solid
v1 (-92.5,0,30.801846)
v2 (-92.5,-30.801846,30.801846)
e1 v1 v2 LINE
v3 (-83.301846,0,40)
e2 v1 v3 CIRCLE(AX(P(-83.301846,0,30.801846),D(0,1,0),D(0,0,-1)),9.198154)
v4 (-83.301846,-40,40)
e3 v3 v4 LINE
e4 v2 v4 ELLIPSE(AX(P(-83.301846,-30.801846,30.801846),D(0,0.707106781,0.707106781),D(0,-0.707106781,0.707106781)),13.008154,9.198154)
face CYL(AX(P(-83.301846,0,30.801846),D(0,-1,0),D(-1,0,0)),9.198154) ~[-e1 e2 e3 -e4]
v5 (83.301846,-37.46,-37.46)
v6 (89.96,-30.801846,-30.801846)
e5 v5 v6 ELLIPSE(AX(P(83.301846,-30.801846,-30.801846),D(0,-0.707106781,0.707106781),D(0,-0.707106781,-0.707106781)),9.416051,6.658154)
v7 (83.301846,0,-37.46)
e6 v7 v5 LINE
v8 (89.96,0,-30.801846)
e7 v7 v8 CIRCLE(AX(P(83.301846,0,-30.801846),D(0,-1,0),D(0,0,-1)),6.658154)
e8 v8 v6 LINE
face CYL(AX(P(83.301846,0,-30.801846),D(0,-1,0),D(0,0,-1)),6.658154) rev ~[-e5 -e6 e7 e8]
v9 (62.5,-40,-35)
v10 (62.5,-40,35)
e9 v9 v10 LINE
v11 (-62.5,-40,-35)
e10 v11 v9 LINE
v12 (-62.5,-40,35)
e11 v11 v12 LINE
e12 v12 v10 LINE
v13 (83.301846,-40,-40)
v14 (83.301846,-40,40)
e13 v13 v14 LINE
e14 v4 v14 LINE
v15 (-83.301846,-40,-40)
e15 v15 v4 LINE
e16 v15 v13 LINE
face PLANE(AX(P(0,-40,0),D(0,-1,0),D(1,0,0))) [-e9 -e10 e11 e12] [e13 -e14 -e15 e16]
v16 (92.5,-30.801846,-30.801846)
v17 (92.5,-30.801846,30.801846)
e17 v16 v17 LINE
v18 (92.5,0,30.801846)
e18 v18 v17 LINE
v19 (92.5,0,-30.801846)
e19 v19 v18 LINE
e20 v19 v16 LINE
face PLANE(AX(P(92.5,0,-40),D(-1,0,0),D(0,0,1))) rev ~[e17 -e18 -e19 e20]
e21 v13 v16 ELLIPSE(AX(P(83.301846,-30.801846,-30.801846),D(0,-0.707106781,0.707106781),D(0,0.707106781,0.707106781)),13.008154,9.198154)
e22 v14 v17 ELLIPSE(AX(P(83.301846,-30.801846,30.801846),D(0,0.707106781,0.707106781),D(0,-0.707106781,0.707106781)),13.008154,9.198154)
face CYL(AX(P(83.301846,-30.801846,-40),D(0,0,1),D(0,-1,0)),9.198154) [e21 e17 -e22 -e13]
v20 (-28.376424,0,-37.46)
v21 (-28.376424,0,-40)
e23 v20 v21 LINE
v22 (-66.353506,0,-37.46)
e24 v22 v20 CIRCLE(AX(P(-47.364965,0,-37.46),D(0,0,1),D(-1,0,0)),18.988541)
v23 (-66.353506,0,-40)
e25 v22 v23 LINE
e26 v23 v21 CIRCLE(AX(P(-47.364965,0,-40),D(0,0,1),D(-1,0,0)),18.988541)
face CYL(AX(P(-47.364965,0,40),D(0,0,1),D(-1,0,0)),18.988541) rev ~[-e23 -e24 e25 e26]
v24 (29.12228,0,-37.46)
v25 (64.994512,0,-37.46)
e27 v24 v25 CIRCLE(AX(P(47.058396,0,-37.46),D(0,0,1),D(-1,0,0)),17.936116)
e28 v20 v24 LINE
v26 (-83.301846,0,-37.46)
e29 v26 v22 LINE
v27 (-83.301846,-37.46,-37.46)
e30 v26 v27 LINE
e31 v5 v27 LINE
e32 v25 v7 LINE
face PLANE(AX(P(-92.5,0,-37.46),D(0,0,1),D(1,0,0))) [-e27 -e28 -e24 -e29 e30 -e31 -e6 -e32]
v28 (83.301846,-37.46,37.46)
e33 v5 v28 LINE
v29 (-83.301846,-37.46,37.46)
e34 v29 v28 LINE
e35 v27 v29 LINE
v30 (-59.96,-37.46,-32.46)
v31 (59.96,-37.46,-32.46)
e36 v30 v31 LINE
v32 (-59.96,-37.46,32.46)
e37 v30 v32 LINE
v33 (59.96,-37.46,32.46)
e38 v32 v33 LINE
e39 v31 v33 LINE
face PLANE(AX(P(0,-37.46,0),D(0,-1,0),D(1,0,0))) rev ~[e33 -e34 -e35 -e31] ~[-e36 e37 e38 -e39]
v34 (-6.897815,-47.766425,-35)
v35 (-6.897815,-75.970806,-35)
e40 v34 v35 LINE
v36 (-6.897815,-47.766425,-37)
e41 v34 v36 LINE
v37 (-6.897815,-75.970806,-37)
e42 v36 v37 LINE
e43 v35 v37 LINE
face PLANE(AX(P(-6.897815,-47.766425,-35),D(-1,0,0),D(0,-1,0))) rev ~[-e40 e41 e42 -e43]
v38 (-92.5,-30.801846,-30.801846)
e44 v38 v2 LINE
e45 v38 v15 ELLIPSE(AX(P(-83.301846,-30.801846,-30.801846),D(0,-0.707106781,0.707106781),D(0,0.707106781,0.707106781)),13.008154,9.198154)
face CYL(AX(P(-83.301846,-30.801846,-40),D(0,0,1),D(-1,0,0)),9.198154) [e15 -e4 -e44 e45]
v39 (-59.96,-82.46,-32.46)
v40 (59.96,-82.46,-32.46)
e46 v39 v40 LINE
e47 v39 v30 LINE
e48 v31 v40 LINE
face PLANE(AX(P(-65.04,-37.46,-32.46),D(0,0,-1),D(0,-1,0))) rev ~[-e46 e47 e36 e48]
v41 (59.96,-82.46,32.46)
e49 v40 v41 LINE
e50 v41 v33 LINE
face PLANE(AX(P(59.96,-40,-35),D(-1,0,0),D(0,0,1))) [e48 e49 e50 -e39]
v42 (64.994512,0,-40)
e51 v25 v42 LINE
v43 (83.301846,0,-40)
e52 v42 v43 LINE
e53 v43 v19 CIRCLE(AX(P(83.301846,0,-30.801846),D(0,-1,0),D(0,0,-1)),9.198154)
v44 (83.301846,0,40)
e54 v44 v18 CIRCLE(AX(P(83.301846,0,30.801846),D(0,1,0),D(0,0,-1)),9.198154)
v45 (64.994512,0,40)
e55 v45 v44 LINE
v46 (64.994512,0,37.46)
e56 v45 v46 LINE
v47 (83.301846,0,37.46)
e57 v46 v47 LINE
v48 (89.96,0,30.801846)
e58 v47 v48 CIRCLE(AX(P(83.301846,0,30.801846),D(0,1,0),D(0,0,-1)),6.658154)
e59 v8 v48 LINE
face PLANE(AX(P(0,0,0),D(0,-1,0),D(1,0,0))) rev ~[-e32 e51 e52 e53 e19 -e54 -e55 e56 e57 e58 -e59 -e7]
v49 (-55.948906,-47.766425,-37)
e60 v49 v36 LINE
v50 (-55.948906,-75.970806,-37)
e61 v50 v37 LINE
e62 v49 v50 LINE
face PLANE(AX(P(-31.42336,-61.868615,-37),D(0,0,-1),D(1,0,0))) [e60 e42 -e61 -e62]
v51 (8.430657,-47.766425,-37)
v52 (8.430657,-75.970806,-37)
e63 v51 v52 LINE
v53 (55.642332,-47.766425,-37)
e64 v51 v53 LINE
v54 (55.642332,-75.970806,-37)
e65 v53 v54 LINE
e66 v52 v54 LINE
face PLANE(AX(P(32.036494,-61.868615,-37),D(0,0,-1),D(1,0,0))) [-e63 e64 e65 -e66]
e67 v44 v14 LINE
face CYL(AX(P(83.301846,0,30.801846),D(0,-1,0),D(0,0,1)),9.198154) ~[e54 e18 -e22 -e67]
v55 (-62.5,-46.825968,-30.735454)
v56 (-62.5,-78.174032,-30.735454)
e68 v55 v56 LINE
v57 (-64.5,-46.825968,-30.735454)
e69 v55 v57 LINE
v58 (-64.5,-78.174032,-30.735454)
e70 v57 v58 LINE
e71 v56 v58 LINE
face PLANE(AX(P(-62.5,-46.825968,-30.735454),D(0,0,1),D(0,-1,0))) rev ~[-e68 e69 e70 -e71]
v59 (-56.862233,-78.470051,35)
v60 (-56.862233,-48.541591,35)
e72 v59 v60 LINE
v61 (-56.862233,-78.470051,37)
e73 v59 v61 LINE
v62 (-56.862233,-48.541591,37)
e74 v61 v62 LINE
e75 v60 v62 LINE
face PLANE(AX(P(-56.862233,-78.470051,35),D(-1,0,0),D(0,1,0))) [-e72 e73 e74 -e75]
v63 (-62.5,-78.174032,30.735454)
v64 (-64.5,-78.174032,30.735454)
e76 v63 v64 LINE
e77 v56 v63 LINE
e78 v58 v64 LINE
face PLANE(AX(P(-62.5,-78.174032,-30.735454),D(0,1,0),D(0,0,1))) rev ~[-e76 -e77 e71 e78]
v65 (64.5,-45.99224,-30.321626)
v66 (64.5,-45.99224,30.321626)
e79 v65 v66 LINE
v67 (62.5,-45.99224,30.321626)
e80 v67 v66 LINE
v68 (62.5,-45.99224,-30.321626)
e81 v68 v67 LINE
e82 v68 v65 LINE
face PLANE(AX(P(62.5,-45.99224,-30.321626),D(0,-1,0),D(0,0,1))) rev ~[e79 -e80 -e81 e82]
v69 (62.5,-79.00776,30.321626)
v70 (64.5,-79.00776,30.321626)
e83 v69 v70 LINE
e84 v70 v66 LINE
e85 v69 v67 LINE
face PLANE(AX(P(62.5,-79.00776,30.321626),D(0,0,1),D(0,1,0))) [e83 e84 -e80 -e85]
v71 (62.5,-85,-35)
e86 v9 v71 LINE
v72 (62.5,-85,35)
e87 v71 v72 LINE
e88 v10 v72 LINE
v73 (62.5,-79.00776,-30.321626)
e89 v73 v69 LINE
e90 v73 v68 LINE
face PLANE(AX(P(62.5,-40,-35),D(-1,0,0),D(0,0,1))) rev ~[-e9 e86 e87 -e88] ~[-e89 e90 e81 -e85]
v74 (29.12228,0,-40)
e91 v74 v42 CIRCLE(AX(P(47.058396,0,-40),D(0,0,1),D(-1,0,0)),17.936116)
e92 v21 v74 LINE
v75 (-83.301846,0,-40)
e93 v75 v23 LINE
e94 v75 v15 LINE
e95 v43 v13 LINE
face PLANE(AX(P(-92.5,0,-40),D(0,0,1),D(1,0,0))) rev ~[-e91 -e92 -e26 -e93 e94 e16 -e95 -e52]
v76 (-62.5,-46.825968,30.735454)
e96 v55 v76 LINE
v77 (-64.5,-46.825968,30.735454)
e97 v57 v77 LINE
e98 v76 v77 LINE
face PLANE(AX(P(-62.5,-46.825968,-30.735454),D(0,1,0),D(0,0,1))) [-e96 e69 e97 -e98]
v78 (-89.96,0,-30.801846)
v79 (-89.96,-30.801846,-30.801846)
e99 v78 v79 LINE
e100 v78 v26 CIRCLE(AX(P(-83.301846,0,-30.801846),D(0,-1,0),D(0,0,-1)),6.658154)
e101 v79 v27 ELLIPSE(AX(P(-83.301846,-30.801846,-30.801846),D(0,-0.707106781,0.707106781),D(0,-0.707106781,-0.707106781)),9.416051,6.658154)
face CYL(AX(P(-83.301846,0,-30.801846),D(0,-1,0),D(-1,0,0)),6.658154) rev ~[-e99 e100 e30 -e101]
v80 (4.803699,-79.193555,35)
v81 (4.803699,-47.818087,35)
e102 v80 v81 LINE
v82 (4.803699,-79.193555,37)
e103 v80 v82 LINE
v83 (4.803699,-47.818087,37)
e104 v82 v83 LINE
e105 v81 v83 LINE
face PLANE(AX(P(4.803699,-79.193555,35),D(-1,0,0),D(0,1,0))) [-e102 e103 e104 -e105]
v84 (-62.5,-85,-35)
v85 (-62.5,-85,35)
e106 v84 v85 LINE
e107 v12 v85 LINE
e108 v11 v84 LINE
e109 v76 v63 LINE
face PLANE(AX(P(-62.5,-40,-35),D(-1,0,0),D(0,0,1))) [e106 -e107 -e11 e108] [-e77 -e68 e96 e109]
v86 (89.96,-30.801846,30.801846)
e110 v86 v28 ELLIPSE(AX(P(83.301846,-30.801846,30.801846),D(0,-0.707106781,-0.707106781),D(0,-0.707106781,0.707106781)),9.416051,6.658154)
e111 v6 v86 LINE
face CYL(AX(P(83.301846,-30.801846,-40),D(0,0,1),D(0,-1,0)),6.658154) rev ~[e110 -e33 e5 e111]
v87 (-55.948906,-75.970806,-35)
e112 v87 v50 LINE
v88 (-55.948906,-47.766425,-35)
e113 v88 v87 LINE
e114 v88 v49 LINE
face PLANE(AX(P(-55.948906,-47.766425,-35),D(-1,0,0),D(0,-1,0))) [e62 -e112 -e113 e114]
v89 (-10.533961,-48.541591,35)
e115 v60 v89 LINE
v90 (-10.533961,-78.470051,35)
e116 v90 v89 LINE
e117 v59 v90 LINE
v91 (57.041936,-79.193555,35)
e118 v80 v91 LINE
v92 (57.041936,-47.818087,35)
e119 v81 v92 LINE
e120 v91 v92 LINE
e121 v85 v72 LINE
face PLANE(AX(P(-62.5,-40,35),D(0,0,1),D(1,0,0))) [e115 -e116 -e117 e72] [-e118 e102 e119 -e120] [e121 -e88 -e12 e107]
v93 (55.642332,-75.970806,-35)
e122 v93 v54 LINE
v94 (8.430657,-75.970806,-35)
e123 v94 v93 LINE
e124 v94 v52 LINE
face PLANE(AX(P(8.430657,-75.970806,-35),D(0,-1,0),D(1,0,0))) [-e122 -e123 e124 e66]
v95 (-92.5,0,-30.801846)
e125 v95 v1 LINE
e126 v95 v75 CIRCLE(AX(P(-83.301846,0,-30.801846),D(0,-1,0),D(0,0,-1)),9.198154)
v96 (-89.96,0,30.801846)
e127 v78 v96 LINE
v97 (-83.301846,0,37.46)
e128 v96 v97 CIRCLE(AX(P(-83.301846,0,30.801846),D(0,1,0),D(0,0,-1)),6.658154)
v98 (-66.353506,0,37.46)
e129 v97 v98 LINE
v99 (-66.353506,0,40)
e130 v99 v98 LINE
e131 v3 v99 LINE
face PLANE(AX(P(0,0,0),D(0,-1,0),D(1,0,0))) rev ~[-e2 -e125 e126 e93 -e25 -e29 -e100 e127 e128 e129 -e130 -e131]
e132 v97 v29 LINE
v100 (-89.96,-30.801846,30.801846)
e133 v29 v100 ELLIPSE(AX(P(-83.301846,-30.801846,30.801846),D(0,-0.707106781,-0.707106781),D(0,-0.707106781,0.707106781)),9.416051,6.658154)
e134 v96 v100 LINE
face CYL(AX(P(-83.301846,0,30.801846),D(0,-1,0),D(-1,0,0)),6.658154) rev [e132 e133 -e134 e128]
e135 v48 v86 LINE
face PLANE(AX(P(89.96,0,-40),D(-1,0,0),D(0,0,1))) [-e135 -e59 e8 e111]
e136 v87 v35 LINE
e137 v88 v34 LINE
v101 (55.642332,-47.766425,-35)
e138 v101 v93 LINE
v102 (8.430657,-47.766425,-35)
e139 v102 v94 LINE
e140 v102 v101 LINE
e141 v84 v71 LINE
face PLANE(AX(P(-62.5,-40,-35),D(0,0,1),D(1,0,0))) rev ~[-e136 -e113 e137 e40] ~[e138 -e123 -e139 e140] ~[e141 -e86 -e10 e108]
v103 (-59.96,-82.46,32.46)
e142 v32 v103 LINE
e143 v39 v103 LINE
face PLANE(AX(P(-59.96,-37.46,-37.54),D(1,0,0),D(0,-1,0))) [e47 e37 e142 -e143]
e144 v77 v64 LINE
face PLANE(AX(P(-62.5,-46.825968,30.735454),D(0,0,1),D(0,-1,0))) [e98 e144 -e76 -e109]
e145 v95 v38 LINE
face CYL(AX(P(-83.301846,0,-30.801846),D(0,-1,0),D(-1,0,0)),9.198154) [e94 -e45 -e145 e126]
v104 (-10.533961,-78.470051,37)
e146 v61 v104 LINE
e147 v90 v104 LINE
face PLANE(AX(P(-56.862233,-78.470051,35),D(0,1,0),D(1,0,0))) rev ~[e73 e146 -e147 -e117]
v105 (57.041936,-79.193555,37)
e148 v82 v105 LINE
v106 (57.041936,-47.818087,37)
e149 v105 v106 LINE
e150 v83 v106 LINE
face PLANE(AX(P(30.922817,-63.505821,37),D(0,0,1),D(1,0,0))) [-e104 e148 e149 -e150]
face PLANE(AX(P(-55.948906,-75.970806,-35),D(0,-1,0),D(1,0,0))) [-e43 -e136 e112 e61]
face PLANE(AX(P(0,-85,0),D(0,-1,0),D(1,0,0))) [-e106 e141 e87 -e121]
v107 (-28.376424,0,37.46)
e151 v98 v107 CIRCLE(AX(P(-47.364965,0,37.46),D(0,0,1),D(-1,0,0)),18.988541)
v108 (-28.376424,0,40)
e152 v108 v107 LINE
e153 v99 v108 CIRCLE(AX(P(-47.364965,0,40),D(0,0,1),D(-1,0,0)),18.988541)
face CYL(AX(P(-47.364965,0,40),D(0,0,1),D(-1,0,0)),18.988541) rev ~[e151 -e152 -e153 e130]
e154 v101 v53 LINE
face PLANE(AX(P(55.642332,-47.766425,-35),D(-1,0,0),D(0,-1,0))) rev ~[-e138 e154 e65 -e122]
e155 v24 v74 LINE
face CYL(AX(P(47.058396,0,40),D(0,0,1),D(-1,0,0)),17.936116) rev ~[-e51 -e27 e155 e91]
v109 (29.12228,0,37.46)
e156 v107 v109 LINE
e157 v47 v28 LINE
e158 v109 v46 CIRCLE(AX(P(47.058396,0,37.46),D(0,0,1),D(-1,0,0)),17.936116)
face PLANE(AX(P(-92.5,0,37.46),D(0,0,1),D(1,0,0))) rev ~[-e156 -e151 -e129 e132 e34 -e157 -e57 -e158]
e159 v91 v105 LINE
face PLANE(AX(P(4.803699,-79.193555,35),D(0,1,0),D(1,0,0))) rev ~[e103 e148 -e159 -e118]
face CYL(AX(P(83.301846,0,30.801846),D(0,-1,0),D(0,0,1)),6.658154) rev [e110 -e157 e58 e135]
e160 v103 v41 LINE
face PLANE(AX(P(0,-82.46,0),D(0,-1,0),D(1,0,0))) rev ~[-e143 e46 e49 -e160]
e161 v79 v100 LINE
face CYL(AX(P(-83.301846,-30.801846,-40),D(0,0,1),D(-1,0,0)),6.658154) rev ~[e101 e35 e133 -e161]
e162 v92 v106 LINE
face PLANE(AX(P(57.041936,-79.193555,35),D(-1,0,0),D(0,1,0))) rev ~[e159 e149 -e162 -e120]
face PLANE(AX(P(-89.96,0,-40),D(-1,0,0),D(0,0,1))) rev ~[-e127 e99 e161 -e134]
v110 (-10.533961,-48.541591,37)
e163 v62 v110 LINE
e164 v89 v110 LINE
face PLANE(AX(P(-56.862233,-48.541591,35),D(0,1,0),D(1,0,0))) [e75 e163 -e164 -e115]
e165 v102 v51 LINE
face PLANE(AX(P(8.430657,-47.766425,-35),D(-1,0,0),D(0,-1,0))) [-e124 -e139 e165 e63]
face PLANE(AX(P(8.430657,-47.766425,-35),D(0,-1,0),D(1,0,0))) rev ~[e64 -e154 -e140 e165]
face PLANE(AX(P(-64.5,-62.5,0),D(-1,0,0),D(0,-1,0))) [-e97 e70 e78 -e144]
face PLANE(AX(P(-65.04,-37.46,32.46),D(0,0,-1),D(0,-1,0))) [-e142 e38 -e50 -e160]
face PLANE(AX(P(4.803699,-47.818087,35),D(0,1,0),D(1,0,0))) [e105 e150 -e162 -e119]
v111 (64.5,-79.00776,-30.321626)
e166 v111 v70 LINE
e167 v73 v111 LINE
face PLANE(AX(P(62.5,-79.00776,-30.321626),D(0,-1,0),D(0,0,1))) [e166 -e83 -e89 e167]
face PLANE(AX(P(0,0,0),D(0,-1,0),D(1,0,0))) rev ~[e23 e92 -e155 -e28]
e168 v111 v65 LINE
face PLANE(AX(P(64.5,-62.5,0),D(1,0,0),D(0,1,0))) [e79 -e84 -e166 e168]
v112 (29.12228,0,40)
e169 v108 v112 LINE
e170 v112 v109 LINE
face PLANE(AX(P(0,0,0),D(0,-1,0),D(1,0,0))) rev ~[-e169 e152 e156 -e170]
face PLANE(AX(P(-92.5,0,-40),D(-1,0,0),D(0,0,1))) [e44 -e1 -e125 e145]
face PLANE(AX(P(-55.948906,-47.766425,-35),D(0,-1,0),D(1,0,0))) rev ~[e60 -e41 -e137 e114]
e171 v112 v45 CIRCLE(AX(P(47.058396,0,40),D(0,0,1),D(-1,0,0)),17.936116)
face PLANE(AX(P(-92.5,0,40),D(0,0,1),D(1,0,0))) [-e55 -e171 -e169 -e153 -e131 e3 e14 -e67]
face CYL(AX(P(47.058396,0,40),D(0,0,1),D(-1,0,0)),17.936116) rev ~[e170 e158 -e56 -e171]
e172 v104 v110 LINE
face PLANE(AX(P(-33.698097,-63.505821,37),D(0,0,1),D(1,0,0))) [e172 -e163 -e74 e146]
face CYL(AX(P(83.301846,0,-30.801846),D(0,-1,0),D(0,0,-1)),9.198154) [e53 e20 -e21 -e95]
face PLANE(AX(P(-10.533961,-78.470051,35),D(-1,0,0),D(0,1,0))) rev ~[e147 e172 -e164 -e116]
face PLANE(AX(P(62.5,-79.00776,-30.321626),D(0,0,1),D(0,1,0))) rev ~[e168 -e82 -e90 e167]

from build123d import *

# Parameters (mm, degrees)
F0_W        = 185
F0_H        = 80
F1_DEPTH    = 40
F2_W        = 125
F2_H        = 70
F3_DEPTH    = 45
F4_R        = 9.1981536726
F5_T        = 2.54
F5_T3_DEPTH = 130.08
F5_T5_DEPTH = 75.08
F7_DEPTH    = 112.6
F8_W        = 49.0510910749
F8_H        = 28.2043814659
F8_W_2      = 47.2116749734
F9_DEPTH    = 2
F10_W       = 52.2382371128
F10_H       = 31.3754677773
F10_W_2     = 46.3282726705
F10_H_2     = 29.9284607172
F11_DEPTH   = 2
F12_W       = 31.3480645418
F12_H       = 61.4709071815
F13_DEPTH   = 2
F14_W       = 33.0155193806
F14_H       = 60.6432519853
F15_DEPTH   = 2


# Not quite as in the source:
# - a shell that OpenCascade refuses in one call is made with other operations: the cavity is built on its own and cut out


with BuildPart() as f1:
    # F0 (on Front) → F1 (new body)
    with BuildSketch(Plane.XZ):
        Rectangle(F0_W, F0_H)
    extrude(amount=F1_DEPTH)

    # F2 (on face) → F3 (join)
    with BuildSketch(Plane.XZ.offset(40)):
        Rectangle(F2_W, F2_H)
    extrude(amount=F3_DEPTH)

    # F4
    f4_edges = [f1.edges().sort_by_distance(p)[0] for p in [
        (-92.5, -40, 0),
        (92.5, -40, 0),
        (92.5, -20, 40),
        (92.5, -20, -40),
        (-92.5, -20, -40),
        (-92.5, -20, 40),
    ]]
    fillet(f4_edges, radius=F4_R)

    # F5: shell of thickness 2.54, made by hand


with BuildPart() as f5_core1:
    # F5_t2: copy of F1
    add(f1.part)

    # the walls: a layer under each face that stays
    f5_faces = [f5_core1.faces().sort_by_distance(p)[0] for p in [
        (0, -20, 40),
        (89.8059231637, -20, 37.3059231637),
        (-89.8059231637, -20, 37.3059231637),
        (-71.4015825663, -40, -34.2857142857),
        (92.5, -15.4009231637, 0),
        (-92.5, -15.4009231637, 0),
        (89.8059231637, -20, -37.3059231637),
        (-89.8059231637, -20, -37.3059231637),
        (0, -20, -40),
        (89.8059231637, -37.3059231637, 0),
        (-89.8059231637, -37.3059231637, 0),
        (0, -62.5, 35),
        (-62.5, -62.5, 0),
        (0, -62.5, -35),
        (62.5, -62.5, 0),
        (0, -85, 0),
    ]]
    thicken(f5_faces, amount=-F5_T, mode=Mode.SUBTRACT)

    # F5_s4 → F5_t3 (cut)
    with BuildSketch(Plane.YZ.offset(-65.04)):
        Polygon((-40.0254, 35.0254), (-37.46, 35), (-37.46, 32.46), (-40, 32.46), align=None)
        Polygon((-40.0254, -35.0254), (-37.46, -35), (-37.46, -32.46), (-40, -32.46), align=None)
    extrude(amount=F5_T3_DEPTH, mode=Mode.SUBTRACT)

    # F5_s6 → F5_t5 (cut)
    with BuildSketch(Plane.XY.offset(-37.54)):
        Polygon((-62.5254, -40.0254), (-62.5, -37.46), (-59.96, -37.46), (-59.96, -40), align=None)
        Polygon((62.5254, -40.0254), (62.5, -37.46), (59.96, -37.46), (59.96, -40), align=None)
    extrude(amount=F5_T5_DEPTH, mode=Mode.SUBTRACT)


with BuildPart() as f1_1:
    add(f1.part)

    # what is left inside the walls is the cavity
    f5_cavity = [f5_core1.part.solids().sort_by_distance(p)[0] for p in [
        (0, -0.0254, -12.486667),
    ]]
    add(f5_cavity, mode=Mode.SUBTRACT)

    # F6 (on face) → F7 (cut)
    with BuildSketch(Plane.XY.offset(40)):
        with BuildLine():
            ThreePointArc((-66.3535060933, 0), (-47.3649650812, -18.9885410121), (-28.3764240691, 0))
            Line((-28.3764240691, 0), (-66.3535060933, 0))
        make_face()
        with BuildLine():
            Line((64.9945122235, 0), (29.1222798593, 0))
            ThreePointArc((29.1222798593, 0), (47.0583960414, -17.9361161821), (64.9945122235, 0))
        make_face()
    extrude(amount=-F7_DEPTH, mode=Mode.SUBTRACT)

    # F8 (on face) → F9 (join)
    with BuildSketch(Plane(origin=(0, 0, -35), x_dir=(1, 0, 0), z_dir=(0, 0, -1))):
        with Locations((-31.4233601093, 61.8686154485)):
            Rectangle(F8_W, F8_H)
        with Locations((32.0364944637, 61.8686154485)):
            Rectangle(F8_W_2, F8_H)
    extrude(amount=F9_DEPTH)

    # F10 (on face) → F11 (join)
    with BuildSketch(Plane.XY.offset(35)):
        with Locations((30.9228170663, -63.50582093)):
            Rectangle(F10_W, F10_H)
        with Locations((-33.6980968714, -63.50582093)):
            Rectangle(F10_W_2, F10_H_2)
    extrude(amount=F11_DEPTH)

    # F12 (on face) → F13 (join)
    with BuildSketch(Plane(origin=(-62.5, 0, 0), x_dir=(0, -1, 0), z_dir=(-1, 0, 0))):
        with Locations((62.5, 0)):
            Rectangle(F12_W, F12_H)
    extrude(amount=F13_DEPTH)

    # F14 (on face) → F15 (join)
    with BuildSketch(Plane.YZ.offset(62.5)):
        with Locations((-62.5, 0)):
            Rectangle(F14_W, F14_H)
    extrude(amount=F15_DEPTH)


solid = f1_1.part
